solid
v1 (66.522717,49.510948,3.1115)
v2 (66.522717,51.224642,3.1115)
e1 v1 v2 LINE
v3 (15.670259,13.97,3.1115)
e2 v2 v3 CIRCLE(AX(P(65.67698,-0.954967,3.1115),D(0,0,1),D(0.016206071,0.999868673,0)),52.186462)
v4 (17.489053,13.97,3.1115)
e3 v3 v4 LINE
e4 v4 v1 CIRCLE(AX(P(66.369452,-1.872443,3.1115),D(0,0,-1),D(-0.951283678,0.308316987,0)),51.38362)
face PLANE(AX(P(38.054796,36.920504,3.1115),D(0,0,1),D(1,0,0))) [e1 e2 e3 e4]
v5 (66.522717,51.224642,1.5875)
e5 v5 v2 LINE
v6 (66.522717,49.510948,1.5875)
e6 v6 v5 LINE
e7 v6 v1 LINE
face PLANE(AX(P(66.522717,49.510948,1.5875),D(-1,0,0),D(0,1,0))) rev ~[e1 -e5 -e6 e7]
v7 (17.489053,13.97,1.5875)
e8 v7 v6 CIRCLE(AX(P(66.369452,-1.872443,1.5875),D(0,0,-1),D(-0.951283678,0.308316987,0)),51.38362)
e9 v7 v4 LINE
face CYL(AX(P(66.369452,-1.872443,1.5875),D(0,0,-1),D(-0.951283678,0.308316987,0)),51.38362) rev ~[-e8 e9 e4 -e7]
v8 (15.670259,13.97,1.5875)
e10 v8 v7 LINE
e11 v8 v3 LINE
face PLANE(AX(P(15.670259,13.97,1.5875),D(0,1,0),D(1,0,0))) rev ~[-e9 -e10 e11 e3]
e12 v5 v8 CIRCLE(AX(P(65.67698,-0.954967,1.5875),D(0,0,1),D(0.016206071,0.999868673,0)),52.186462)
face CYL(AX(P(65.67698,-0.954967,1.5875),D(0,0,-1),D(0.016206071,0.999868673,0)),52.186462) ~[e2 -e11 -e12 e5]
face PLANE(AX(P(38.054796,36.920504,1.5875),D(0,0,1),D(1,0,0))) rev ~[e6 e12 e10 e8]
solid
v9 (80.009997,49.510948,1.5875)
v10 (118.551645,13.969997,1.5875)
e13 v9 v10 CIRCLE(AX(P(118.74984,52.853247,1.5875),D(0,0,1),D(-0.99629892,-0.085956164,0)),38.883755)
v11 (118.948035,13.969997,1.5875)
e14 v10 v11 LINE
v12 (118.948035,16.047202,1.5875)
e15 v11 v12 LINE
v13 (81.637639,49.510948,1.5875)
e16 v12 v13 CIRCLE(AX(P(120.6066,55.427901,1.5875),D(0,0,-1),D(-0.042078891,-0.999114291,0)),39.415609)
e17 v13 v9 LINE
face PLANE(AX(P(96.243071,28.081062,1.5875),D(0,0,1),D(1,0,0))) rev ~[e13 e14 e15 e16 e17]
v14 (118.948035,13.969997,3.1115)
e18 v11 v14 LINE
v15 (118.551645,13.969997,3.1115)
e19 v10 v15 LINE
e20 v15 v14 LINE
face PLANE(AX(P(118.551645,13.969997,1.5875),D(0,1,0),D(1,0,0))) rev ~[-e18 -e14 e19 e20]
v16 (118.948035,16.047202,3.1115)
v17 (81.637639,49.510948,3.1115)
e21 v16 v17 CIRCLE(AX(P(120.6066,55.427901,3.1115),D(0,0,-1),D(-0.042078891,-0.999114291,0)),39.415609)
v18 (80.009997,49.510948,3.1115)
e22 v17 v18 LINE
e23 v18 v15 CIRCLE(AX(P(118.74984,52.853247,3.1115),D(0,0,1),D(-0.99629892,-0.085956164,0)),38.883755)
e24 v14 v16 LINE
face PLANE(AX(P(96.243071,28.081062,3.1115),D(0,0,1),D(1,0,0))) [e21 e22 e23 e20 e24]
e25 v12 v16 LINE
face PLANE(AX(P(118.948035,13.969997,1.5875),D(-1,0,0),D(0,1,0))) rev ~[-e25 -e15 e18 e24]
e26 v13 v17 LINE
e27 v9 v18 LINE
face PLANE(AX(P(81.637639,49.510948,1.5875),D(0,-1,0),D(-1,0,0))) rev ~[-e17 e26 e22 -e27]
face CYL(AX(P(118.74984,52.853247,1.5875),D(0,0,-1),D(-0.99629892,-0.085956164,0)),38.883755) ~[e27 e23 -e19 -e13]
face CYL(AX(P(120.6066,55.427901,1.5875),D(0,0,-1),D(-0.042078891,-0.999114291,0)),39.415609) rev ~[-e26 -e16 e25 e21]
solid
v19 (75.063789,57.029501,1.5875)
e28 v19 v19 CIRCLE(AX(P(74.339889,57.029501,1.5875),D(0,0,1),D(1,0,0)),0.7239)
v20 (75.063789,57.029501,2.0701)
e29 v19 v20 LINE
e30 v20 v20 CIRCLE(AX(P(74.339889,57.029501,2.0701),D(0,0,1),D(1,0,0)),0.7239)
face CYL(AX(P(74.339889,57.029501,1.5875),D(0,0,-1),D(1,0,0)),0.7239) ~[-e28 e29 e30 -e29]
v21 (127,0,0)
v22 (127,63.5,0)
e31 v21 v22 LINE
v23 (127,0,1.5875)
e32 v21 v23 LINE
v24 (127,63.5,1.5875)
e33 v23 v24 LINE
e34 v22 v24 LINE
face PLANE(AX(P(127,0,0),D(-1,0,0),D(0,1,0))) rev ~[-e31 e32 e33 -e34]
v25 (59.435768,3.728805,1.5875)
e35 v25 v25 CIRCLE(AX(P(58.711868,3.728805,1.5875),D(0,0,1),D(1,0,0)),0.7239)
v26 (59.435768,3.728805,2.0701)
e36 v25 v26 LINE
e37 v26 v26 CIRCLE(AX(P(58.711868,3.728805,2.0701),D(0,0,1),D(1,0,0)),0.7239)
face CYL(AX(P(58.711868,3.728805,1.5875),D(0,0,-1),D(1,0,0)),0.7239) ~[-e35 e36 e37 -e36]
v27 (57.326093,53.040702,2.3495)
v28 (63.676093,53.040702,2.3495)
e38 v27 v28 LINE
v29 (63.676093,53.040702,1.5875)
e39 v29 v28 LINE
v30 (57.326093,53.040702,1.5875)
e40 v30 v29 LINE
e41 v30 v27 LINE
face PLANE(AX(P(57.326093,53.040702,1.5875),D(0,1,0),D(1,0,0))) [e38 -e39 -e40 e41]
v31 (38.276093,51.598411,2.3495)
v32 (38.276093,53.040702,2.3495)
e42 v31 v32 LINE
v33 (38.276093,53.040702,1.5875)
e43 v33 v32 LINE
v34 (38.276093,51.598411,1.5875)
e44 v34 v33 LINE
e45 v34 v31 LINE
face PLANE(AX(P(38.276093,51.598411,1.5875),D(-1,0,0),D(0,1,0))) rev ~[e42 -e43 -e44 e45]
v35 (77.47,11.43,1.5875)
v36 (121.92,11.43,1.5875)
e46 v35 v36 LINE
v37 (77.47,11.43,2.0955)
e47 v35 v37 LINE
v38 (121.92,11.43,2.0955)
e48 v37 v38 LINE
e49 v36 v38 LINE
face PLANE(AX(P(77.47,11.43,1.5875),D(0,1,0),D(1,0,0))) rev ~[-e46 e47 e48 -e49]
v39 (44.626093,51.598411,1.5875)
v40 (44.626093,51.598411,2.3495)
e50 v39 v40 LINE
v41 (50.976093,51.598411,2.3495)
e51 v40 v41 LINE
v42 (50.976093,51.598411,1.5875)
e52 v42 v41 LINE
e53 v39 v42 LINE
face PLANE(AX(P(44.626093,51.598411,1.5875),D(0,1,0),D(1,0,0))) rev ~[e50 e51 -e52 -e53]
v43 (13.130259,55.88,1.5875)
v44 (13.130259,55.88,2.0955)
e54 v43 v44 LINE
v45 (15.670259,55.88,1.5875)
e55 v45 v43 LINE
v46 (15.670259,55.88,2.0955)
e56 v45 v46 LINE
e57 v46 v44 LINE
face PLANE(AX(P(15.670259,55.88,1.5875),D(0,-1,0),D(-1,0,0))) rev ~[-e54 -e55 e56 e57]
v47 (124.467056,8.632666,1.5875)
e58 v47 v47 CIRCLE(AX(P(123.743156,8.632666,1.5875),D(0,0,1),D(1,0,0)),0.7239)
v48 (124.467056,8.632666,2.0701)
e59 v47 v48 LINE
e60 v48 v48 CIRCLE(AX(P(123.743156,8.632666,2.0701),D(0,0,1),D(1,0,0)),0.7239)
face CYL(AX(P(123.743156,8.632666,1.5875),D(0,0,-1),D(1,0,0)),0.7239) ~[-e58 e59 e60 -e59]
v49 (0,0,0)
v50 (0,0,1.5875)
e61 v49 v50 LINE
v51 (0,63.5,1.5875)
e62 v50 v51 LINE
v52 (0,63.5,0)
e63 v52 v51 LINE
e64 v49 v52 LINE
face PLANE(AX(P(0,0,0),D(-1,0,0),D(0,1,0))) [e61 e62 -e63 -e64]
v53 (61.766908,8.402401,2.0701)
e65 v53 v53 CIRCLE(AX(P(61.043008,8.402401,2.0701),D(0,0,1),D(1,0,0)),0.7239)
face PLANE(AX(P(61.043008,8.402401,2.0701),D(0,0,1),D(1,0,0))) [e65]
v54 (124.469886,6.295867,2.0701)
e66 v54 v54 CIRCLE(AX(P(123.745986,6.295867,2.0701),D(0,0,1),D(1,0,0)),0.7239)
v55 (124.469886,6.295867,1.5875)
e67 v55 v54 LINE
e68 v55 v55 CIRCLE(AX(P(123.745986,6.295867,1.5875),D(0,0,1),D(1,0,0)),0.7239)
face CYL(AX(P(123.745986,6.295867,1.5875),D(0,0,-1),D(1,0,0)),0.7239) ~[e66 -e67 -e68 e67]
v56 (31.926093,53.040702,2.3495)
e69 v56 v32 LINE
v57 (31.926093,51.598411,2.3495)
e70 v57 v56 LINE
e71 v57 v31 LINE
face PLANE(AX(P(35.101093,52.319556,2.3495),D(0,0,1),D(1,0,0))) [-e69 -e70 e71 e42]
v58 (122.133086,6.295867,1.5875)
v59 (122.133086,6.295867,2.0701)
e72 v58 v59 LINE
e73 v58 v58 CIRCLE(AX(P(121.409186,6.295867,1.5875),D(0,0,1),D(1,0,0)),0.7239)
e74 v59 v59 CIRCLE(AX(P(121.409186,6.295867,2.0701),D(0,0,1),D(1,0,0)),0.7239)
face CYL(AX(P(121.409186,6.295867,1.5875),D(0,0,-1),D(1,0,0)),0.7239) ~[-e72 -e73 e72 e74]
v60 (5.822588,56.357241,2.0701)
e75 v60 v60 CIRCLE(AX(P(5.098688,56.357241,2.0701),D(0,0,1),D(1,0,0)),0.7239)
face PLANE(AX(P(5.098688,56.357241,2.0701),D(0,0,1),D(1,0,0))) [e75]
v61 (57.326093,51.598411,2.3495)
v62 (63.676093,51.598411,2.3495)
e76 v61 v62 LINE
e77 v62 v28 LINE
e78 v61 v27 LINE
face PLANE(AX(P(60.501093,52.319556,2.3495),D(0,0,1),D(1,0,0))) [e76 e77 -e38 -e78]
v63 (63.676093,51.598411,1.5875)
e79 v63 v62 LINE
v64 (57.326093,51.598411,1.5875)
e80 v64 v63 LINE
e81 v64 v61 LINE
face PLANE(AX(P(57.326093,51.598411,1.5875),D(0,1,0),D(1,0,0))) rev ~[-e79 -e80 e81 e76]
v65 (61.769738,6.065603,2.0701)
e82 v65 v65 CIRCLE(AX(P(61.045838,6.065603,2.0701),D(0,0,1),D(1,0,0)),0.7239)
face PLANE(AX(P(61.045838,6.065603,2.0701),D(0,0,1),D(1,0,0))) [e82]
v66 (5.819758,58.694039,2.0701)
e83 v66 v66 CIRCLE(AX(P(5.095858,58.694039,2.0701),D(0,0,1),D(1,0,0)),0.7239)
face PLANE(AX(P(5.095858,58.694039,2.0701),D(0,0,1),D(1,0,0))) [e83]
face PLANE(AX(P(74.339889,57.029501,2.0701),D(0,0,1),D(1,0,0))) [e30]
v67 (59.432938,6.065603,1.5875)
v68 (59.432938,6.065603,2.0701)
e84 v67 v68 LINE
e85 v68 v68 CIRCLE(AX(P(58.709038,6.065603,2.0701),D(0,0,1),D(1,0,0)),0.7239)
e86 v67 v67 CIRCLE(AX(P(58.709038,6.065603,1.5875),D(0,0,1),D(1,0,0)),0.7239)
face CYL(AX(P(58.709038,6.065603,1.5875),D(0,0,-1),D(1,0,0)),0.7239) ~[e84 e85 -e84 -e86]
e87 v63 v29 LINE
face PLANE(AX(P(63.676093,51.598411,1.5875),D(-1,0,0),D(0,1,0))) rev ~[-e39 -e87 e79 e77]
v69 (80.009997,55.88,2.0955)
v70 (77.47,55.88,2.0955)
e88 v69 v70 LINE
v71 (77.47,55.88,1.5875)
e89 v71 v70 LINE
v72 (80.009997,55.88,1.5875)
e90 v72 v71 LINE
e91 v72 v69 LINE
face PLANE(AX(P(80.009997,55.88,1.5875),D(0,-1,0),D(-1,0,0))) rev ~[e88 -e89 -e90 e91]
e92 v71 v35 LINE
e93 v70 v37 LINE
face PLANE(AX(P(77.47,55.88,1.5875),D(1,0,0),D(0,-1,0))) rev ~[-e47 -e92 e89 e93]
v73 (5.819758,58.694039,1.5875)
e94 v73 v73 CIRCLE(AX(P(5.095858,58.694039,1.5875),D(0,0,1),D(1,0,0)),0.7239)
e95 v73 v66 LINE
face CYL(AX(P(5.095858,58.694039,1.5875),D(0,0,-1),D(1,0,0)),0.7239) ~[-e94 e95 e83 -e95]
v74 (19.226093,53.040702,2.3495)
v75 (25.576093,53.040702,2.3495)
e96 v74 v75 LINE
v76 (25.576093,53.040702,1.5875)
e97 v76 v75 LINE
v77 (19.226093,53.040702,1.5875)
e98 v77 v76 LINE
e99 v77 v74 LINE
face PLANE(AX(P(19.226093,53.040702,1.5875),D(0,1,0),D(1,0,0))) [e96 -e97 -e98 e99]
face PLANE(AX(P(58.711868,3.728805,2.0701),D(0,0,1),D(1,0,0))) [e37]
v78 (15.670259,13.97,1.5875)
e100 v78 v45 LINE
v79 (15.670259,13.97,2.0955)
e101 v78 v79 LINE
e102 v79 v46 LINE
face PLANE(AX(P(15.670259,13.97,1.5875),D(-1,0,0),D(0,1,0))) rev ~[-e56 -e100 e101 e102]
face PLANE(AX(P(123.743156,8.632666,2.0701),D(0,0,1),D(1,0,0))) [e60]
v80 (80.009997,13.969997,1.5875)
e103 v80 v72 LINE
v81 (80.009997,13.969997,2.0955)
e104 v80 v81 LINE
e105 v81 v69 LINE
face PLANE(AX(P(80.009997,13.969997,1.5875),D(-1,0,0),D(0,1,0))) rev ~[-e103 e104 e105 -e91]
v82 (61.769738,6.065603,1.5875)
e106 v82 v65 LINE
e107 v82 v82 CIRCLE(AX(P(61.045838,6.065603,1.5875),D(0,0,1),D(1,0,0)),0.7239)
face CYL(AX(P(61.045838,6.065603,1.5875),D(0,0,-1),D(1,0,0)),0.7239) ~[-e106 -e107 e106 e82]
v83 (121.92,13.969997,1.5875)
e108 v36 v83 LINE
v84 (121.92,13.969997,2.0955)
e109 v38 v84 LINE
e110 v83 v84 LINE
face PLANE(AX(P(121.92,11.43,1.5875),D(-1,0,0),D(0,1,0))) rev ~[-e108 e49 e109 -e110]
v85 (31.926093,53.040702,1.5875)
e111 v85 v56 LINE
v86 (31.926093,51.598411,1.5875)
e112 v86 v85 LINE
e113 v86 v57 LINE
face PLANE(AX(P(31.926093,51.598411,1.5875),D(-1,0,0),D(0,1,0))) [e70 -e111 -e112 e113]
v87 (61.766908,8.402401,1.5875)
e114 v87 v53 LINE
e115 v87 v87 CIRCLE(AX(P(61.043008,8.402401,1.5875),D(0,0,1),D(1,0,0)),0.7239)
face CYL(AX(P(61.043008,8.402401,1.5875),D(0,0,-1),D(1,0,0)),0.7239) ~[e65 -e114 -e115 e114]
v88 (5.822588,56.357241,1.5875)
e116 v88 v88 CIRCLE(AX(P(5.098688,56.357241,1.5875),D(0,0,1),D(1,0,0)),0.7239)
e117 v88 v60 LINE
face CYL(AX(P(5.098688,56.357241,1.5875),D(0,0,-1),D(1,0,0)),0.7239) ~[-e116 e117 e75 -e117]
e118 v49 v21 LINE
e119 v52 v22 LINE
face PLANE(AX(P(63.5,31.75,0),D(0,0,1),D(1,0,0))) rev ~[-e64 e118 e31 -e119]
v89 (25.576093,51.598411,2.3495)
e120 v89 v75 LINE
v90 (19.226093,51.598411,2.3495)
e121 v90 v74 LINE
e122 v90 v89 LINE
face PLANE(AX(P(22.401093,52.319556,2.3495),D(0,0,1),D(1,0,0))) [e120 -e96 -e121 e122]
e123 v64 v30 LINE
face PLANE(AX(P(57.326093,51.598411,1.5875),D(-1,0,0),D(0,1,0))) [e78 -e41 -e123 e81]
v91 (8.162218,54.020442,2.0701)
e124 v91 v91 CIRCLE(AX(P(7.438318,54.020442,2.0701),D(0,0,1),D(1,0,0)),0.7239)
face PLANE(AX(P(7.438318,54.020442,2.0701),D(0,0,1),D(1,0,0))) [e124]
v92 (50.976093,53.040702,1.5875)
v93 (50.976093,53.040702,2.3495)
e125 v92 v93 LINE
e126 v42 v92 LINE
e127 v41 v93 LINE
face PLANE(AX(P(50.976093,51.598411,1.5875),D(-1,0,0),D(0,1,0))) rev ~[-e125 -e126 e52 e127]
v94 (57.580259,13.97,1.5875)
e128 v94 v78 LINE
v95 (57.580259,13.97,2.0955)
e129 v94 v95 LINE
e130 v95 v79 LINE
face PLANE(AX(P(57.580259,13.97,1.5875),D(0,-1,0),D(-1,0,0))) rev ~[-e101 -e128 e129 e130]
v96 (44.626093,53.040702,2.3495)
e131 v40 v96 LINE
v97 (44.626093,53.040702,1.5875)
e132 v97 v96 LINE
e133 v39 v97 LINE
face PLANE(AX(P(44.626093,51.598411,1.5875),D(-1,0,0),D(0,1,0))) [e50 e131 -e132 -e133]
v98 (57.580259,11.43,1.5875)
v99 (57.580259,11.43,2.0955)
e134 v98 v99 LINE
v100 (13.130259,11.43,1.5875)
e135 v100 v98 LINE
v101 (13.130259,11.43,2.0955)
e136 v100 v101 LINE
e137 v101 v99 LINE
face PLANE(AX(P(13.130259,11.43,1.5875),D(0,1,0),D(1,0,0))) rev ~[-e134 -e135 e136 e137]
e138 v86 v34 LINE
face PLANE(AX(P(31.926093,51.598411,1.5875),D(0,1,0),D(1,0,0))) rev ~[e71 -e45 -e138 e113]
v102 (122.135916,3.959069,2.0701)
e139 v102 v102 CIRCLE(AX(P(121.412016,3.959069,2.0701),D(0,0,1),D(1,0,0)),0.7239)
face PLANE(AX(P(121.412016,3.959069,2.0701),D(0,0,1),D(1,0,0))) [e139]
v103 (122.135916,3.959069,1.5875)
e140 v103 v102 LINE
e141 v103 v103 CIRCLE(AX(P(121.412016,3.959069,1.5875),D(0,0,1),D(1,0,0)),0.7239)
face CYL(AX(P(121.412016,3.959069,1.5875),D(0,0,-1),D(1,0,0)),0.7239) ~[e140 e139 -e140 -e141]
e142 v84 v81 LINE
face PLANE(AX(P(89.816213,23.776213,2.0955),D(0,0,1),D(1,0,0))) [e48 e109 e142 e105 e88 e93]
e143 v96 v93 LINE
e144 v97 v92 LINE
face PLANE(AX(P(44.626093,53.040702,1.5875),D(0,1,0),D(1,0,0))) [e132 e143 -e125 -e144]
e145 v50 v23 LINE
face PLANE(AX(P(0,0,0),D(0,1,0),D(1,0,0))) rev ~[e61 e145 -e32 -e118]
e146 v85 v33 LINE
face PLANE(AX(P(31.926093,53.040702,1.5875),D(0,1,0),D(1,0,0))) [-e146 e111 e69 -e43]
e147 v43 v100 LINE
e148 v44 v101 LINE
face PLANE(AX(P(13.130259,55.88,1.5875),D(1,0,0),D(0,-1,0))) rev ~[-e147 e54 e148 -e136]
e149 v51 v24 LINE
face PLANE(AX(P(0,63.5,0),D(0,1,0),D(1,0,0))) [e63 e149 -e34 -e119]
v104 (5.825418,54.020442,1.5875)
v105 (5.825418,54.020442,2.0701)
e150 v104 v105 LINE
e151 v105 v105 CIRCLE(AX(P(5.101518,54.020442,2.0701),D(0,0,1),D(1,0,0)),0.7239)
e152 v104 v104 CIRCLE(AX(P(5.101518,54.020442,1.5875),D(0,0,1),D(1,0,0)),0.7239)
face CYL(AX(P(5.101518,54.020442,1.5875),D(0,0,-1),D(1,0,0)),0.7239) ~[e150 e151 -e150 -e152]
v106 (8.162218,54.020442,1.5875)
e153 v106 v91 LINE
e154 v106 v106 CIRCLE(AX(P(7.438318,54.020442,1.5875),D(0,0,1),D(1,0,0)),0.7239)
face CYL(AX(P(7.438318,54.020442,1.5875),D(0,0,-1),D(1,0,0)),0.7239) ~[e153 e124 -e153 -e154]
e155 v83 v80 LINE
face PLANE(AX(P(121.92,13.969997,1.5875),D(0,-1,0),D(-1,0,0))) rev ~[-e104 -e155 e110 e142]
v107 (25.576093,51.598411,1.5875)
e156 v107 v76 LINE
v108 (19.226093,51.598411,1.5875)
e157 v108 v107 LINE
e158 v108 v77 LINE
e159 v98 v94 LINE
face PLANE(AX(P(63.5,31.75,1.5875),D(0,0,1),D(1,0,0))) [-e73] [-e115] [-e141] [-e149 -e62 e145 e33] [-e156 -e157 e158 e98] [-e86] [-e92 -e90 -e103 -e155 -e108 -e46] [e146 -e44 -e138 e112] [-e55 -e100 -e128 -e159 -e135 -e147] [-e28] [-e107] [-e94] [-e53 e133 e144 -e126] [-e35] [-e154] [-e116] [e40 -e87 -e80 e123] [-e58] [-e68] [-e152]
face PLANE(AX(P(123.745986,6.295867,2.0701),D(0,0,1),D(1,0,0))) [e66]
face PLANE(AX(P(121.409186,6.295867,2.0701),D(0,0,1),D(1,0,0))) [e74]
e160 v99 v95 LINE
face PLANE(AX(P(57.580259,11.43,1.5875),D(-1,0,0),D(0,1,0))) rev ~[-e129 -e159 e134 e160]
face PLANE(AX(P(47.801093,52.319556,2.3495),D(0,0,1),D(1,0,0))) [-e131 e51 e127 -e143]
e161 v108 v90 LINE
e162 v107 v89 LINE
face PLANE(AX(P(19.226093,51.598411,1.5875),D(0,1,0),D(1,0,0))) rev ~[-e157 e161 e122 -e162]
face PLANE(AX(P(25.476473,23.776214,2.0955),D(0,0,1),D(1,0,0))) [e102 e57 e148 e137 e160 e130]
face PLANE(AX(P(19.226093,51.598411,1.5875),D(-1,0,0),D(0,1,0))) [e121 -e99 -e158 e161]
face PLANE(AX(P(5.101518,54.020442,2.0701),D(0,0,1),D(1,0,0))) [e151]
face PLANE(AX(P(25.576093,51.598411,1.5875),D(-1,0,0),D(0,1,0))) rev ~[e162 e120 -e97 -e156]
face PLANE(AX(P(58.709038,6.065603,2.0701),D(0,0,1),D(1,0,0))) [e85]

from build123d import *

# Parameters (mm, degrees)
F0_W     = 127
F0_H     = 63.5
F1_DEPTH = 1.5875
F3_DEPTH = 0.508
F4_W     = 6.35
F4_H     = 1.4422908425
F5_DEPTH = 0.762
F7_DEPTH = 1.524
F8_R     = 0.7239
F9_DEPTH = 0.4826


# Not quite as in the source:
# - a feature names something its author has since deleted; it is built from what else it names


with BuildPart() as f1:
    # F0 (on Top) → F1 (new body)
    with BuildSketch(Plane.XY):
        with Locations((63.5, 31.75)):
            Rectangle(F0_W, F0_H)
    extrude(amount=F1_DEPTH)

    # F2 (on face) → F3 (join)
    with BuildSketch(Plane.XY.offset(1.5875)):
        Polygon((15.6702585518, 55.88), (13.1302586973, 55.88), (13.1302586973, 11.43), (57.5802586973, 11.43), (57.5802586973, 13.9699998546), (55.0402588427, 13.9699998546), (15.6702585518, 13.9699998546), (15.6702585518, 53.3400001454), align=None)
        Polygon((80.009996891, 55.88), (77.47, 55.88), (77.47, 11.43), (121.92, 11.43), (121.92, 13.969996891), (119.380003109, 13.969996891), (80.009996891, 13.969996891), (80.009996891, 53.340003109), align=None)
    extrude(amount=F3_DEPTH)

    # F4 (on face) → F5 (join)
    with BuildSketch(Plane.XY.offset(1.5875)):
        with Locations((60.5010928452, 52.3195564747)):
            Rectangle(F4_W, F4_H)
        with Locations((47.8010928452, 52.3195564747)):
            Rectangle(F4_W, F4_H)
        with Locations((35.1010928452, 52.3195564747)):
            Rectangle(F4_W, F4_H)
        with Locations((22.4010928452, 52.3195564747)):
            Rectangle(F4_W, F4_H)
    extrude(amount=F5_DEPTH)

    # F8 (on face) → F9 (join)
    with BuildSketch(Plane.XY.offset(1.5875)):
        with Locations((5.095858312, 58.6940389134)):
            Circle(F8_R)
        with Locations((5.0986883188, 56.357240627)):
            Circle(F8_R)
        with Locations((5.1015183256, 54.0204423407)):
            Circle(F8_R)
        with Locations((7.4383183256, 54.0204423407)):
            Circle(F8_R)
        with Locations((58.7118677795, 3.7288046442)):
            Circle(F8_R)
        with Locations((58.7090377727, 6.0656029305)):
            Circle(F8_R)
        with Locations((61.0458377727, 6.0656029305)):
            Circle(F8_R)
        with Locations((61.043007766, 8.4024012169)):
            Circle(F8_R)
        with Locations((74.3398889899, 57.0295006037)):
            Circle(F8_R)
        with Locations((121.4120164514, 3.9590690285)):
            Circle(F8_R)
        with Locations((121.4091864446, 6.2958673148)):
            Circle(F8_R)
        with Locations((123.7431564378, 8.6326656012)):
            Circle(F8_R)
        with Locations((123.7459864446, 6.2958673148)):
            Circle(F8_R)
    extrude(amount=F9_DEPTH)


with BuildPart() as f7:
    # F6 (on face) → F7 (new body)
    with BuildSketch(Plane.XY.offset(1.5875)):
        with BuildLine():
            Line((81.6376388848, 49.51094836), (80.009996891, 49.51094836))
            ThreePointArc((80.009996891, 49.51094836), (92.3901641709, 24.2680426815), (118.5516450515, 13.969996891))
            Line((118.5516450515, 13.969996891), (118.9480349422, 13.969996891))
            Line((118.9480349422, 13.969996891), (118.9480349422, 16.0472020507))
            ThreePointArc((118.9480349422, 16.0472020507), (94.289218877, 26.0853426911), (81.6376388848, 49.51094836))
        make_face()
    extrude(amount=F7_DEPTH)


with BuildPart() as f7b:
    # F6 (on face) → F7, piece 2 (new body)
    with BuildSketch(Plane.XY.offset(1.5875)):
        with BuildLine():
            Line((66.5227174759, 49.51094836), (66.5227174759, 51.2246415019))
            ThreePointArc((66.5227174759, 51.2246415019), (34.8358116044, 41.1431226473), (15.6702585518, 13.9699998546))
            Line((15.6702585518, 13.9699998546), (17.489053309, 13.9699998546))
            ThreePointArc((17.489053309, 13.9699998546), (36.2136378026, 39.7316824187), (66.5227174759, 49.51094836))
        make_face()
    extrude(amount=F7_DEPTH)


solid = Compound([f1.part, f7.part, f7b.part])
